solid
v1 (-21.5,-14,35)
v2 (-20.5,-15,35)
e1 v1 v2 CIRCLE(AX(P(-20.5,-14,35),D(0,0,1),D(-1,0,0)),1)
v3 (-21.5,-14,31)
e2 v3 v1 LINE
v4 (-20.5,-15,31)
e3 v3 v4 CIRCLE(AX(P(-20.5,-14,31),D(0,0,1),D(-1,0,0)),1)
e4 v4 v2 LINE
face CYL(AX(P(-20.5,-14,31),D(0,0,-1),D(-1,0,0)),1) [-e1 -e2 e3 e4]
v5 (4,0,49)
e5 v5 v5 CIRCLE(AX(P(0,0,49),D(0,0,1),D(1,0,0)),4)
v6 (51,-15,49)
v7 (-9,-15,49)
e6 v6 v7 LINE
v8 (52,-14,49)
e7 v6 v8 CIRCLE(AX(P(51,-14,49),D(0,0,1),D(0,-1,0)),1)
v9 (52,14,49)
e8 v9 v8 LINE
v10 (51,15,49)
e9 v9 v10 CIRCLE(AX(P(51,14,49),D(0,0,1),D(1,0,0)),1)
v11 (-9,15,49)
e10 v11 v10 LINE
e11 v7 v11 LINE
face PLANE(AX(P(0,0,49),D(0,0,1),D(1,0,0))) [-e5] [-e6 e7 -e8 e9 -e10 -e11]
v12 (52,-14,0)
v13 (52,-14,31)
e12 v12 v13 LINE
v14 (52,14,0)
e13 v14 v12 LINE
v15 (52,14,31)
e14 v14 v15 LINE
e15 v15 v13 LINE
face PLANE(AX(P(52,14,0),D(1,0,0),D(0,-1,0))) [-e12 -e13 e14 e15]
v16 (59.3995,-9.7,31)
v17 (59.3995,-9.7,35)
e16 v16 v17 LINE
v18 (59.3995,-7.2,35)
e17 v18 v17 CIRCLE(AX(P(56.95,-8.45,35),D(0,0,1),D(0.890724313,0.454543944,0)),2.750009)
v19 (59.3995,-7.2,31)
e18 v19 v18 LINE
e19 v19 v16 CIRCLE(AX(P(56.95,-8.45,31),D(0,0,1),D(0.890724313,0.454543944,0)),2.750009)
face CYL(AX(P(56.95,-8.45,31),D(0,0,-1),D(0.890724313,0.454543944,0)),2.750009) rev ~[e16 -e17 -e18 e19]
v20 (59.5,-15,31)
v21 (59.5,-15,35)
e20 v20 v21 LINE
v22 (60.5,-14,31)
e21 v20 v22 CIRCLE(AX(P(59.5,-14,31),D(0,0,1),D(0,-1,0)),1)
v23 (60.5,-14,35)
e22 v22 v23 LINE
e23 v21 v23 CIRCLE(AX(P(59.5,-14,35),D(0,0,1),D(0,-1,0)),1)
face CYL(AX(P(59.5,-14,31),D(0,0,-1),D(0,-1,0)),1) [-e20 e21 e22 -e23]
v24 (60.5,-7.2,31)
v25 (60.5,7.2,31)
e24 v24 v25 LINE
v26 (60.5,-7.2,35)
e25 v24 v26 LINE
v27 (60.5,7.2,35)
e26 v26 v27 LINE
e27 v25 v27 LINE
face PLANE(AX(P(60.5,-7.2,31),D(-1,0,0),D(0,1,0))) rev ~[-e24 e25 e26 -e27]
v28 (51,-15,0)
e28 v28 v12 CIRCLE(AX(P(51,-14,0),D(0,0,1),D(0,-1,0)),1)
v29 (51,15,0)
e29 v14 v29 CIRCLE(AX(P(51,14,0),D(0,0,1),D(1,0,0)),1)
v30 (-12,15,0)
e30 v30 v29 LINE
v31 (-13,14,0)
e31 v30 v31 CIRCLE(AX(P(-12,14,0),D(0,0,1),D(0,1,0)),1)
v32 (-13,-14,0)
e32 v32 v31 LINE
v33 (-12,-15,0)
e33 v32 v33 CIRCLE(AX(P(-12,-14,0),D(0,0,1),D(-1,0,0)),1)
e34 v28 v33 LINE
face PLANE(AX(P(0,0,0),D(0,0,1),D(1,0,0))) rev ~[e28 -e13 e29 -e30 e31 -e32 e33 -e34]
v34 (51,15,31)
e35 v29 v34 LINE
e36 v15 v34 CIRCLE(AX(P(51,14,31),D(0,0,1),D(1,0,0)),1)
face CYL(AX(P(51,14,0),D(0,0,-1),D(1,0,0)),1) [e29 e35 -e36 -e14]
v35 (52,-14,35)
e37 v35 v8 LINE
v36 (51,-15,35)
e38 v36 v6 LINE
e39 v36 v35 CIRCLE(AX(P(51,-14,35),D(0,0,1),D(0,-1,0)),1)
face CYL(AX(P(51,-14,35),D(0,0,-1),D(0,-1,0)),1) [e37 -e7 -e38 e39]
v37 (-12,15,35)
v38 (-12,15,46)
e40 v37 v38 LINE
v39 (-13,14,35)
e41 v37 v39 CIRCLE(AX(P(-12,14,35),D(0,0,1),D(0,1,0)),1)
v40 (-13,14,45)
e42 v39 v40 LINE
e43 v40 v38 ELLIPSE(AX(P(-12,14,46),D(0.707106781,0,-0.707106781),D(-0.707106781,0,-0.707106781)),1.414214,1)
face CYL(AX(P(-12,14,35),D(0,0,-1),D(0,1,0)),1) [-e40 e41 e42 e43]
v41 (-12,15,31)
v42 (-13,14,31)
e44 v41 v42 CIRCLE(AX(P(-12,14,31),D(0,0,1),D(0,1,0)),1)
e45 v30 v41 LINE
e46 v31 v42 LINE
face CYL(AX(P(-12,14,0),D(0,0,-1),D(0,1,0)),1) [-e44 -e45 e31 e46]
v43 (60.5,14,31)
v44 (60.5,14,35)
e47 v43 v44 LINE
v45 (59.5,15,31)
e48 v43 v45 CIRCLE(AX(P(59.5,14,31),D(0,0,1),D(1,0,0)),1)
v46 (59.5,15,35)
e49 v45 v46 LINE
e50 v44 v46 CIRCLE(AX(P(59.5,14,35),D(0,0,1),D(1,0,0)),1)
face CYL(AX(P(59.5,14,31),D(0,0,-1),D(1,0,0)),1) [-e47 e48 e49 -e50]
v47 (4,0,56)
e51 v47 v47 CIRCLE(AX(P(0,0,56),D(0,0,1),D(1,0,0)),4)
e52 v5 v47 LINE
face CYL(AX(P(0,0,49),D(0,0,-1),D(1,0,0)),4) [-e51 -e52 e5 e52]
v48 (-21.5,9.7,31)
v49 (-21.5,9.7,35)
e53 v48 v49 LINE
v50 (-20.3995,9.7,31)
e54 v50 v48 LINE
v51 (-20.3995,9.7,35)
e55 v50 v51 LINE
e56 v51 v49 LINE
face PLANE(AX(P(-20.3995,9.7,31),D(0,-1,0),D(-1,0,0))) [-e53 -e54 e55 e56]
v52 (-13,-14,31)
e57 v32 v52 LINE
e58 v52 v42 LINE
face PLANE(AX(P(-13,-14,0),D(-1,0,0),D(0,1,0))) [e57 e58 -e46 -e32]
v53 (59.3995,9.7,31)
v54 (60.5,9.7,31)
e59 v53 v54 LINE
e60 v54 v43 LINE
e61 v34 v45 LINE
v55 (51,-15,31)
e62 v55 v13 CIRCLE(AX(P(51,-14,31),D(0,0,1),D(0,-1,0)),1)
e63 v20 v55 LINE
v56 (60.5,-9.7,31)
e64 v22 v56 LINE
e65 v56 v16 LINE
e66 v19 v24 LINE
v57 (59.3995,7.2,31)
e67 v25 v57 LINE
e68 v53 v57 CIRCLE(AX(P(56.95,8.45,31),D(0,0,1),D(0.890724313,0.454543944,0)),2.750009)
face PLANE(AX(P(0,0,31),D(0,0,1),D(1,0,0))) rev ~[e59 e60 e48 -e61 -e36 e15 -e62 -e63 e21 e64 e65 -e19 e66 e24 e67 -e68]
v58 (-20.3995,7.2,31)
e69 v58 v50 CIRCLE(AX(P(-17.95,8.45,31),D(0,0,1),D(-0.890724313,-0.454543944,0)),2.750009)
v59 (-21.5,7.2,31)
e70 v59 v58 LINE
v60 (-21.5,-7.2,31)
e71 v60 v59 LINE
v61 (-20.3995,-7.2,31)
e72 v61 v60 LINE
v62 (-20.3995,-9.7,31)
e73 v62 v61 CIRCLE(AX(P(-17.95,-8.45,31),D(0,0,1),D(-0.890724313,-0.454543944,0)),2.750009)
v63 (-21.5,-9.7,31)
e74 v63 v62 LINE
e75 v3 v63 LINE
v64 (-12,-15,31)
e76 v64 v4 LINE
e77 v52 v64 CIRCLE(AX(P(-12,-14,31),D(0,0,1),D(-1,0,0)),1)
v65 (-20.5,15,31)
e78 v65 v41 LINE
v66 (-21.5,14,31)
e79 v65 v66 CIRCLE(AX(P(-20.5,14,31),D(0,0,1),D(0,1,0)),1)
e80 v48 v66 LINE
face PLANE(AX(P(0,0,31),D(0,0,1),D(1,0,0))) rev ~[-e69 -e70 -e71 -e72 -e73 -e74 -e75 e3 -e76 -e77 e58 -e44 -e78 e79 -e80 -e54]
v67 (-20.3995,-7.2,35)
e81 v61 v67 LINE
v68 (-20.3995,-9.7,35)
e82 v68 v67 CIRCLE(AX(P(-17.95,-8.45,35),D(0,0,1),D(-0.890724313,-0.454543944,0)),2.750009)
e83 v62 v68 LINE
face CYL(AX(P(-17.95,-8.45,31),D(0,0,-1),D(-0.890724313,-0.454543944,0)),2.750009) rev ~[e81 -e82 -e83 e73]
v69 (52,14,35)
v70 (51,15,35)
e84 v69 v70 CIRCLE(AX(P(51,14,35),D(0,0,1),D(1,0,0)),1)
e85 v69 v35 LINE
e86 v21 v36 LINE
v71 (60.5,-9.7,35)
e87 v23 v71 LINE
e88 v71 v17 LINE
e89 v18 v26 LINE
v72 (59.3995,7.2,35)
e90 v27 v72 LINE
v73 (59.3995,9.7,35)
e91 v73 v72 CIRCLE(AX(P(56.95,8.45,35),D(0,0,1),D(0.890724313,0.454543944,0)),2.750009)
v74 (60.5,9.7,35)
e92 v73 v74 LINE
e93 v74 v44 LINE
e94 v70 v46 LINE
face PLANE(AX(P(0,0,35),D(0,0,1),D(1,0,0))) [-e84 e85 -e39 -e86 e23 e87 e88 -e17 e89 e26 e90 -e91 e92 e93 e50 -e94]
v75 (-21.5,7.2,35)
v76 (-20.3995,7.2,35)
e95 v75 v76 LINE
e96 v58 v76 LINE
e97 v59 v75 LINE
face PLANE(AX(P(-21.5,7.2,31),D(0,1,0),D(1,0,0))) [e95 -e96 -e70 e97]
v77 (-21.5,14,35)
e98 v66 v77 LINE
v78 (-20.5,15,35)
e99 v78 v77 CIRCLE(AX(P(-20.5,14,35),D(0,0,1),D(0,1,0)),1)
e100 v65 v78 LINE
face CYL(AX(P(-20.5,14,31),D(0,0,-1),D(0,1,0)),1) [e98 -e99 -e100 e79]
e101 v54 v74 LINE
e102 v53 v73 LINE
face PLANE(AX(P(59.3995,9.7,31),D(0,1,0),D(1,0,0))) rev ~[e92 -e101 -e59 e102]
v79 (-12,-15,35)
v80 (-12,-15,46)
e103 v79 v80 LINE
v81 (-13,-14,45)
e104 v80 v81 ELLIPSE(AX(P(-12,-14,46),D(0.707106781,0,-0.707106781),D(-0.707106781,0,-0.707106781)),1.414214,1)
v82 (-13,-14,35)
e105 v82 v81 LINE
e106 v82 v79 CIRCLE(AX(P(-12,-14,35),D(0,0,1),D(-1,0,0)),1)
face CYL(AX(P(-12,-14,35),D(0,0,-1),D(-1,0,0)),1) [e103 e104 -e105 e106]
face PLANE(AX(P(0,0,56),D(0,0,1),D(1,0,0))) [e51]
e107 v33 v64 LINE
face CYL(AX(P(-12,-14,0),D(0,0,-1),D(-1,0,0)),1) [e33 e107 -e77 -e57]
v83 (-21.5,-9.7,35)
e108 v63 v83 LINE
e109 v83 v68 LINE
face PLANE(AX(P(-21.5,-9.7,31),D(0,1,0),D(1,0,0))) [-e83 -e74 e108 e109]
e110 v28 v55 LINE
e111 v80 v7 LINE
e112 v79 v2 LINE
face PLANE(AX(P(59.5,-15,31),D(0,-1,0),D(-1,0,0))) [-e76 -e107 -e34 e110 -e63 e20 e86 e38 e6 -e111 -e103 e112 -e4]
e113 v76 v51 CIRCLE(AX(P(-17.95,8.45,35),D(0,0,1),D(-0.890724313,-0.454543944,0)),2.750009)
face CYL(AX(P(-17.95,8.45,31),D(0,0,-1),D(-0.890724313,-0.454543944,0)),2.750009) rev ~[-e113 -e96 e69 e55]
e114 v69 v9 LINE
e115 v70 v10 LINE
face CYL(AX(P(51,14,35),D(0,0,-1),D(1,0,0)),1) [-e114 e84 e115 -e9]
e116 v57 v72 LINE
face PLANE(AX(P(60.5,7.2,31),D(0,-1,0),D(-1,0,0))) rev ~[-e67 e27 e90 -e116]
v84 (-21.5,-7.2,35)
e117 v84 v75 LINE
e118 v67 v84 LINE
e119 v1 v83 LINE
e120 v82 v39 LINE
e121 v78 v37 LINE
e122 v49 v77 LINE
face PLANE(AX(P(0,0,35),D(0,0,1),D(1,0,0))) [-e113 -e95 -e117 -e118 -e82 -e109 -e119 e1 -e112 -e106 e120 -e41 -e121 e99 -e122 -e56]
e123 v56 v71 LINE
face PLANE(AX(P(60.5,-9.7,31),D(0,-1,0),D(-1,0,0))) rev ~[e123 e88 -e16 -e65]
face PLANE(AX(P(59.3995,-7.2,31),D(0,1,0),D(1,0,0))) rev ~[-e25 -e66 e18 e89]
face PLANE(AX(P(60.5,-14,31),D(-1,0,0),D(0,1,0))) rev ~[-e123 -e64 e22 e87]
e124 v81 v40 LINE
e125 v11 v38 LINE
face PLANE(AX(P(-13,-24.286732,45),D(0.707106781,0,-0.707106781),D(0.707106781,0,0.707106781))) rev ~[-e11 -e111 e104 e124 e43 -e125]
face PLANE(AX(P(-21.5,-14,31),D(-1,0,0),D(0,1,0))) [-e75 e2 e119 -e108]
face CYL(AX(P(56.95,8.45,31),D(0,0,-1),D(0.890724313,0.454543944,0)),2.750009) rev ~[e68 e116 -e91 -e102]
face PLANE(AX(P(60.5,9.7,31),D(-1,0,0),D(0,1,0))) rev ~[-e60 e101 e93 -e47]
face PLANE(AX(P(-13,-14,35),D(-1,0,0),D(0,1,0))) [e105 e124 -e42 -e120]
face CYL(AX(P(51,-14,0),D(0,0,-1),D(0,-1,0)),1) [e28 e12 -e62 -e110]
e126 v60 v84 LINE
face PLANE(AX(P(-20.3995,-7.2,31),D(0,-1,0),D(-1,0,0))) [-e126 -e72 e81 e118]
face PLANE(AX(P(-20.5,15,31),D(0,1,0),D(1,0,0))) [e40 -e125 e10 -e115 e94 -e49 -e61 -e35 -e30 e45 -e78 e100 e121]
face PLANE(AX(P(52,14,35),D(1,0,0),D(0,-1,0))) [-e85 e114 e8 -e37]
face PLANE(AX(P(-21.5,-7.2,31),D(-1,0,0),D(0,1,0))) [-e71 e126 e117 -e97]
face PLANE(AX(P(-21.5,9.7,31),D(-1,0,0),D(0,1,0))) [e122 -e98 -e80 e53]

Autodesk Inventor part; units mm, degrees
ref_plane "YZ Plane" through (0, 0, 0) normal (1, 0, 0) x (0, 1, 0)
ref_plane "XZ Plane" through (0, 0, 0) normal (0, 1, 0) x (-1, 0, 0)
ref_plane "XY Plane" through (0, 0, 0) normal (0, 0, 1) x (1, 0, 0)
sketch "Skizze1" plane through (0, 0, 0) normal (0, 0, 1) x (1, 0, 0)
  line L0 (-12, 15) -> (51, 15)
  line L1 (52, 14) -> (52, -14)
  line L2 (51, -15) -> (-12, -15)
  line L3 (-13, -14) -> (-13, 14)
  arc A0 (-12, 15) -> (-13, 14) centre (-12, 14) ccw
  arc A1 (-13, -14) -> (-12, -15) centre (-12, -14) ccw
  arc A2 (51, -15) -> (52, -14) centre (51, -14) ccw
  arc A3 (52, 14) -> (51, 15) centre (51, 14) ccw
  point P0 (0, 0)
  point P1 (-13, 15)
  point P2 (52, 15)
  point P3 (-13, -15)
  dimension "d0" = 65
  dimension "d1" = 30
  dimension "d2" = 15
  dimension "d3" = 13
  dimension "d4" = 1
extrude "Extrusion1" add sketch "Skizze1" along normal blind 31
sketch "Skizze2" plane through (0, 0, 31) normal (0, 0, 1) x (1, 0, 0)
  line L0 (-20.5, 15) -> (59.5, 15)
  line L1 (59.5, -15) -> (-20.5, -15)
  arc A0 (-20.5, 15) -> (-21.5, 14) centre (-20.5, 14) ccw
  arc A1 (-21.5, -14) -> (-20.5, -15) centre (-20.5, -14) ccw
  arc A2 (59.5, -15) -> (60.5, -14) centre (59.5, -14) ccw
  arc A3 (60.5, 14) -> (59.5, 15) centre (59.5, 14) ccw
  arc A4 (-20.3995, 7.2) -> (-20.3995, 9.7) centre (-17.95, 8.45) ccw
  arc A5 (-20.3995, -9.7) -> (-20.3995, -7.2) centre (-17.95, -8.45) ccw
  line L2 (-20.3995, -7.2) -> (-21.5, -7.2)
  line L3 (-21.5, -9.7) -> (-20.3995, -9.7)
  line L4 (-21.5, -14) -> (-21.5, -9.7)
  line L5 (-20.3995, 9.7) -> (-21.5, 9.7)
  line L6 (-21.5, 7.2) -> (-20.3995, 7.2)
  line L7 (-21.5, -7.2) -> (-21.5, 7.2)
  line L8 (-21.5, 9.7) -> (-21.5, 14)
  line L9 (19.5, 16.9478) -> (19.5, -22.1923) construction
  arc A6 (59.3995, 9.7) -> (59.3995, 7.2) centre (56.95, 8.45) ccw
  arc A7 (59.3995, -7.2) -> (59.3995, -9.7) centre (56.95, -8.45) ccw
  line L10 (59.3995, -7.2) -> (60.5, -7.2)
  line L11 (60.5, -9.7) -> (59.3995, -9.7)
  line L12 (60.5, -14) -> (60.5, -9.7)
  line L13 (59.3995, 9.7) -> (60.5, 9.7)
  line L14 (60.5, 7.2) -> (59.3995, 7.2)
  line L15 (60.5, -7.2) -> (60.5, 7.2)
  line L16 (60.5, 9.7) -> (60.5, 14)
  point P0 (0, 0)
  point P1 (60.5, -15)
  point P2 (60.5, 15)
  dimension "d7" = 30
  dimension "d10" = 1
  dimension "d11" = 15
  dimension "d12" = 5.5
  dimension "d13" = 5.5
  dimension "d14" = 6.55
  dimension "d15" = 6.55
  dimension "d19" = 1.25
  dimension "d23" = 1.25
  dimension "d25" = 41
  dimension "d26" = 21.5
extrude "Extrusion2" add sketch "Skizze2" along normal blind 4
sketch "Skizze3" plane through (0, 0, 35) normal (0, 0, 1) x (1, 0, 0)
  line L0 (-12, 15) -> (51, 15)
  line L1 (52, 14) -> (52, -14)
  line L2 (51, -15) -> (-12, -15)
  line L3 (-13, -14) -> (-13, 14)
  arc A0 (-12, 15) -> (-13, 14) centre (-12, 14) ccw
  arc A1 (-13, -14) -> (-12, -15) centre (-12, -14) ccw
  arc A2 (51, -15) -> (52, -14) centre (51, -14) ccw
  arc A3 (52, 14) -> (51, 15) centre (51, 14) ccw
  point P0 (0, 0)
  point P1 (0, 0)
  point P2 (-13, 15)
  point P3 (52, 15)
  point P4 (-13, -15)
  dimension "d29" = 65
  dimension "d30" = 30
  dimension "d31" = 15
  dimension "d32" = 13
  dimension "d33" = 1
extrude "Extrusion3" add sketch "Skizze3" along normal blind 14
chamfer "Fase1" distance 4 angle 45 1 edges at (-13, 0, 49)
sketch "Skizze4" plane through (0, 0, 49) normal (0, 0, 1) x (1, 0, 0)
  circle A0 centre (0, 0) radius 4
  dimension "d39" = 8
extrude "Extrusion4" add sketch "Skizze4" along normal blind 7
properties part number "Servo"
